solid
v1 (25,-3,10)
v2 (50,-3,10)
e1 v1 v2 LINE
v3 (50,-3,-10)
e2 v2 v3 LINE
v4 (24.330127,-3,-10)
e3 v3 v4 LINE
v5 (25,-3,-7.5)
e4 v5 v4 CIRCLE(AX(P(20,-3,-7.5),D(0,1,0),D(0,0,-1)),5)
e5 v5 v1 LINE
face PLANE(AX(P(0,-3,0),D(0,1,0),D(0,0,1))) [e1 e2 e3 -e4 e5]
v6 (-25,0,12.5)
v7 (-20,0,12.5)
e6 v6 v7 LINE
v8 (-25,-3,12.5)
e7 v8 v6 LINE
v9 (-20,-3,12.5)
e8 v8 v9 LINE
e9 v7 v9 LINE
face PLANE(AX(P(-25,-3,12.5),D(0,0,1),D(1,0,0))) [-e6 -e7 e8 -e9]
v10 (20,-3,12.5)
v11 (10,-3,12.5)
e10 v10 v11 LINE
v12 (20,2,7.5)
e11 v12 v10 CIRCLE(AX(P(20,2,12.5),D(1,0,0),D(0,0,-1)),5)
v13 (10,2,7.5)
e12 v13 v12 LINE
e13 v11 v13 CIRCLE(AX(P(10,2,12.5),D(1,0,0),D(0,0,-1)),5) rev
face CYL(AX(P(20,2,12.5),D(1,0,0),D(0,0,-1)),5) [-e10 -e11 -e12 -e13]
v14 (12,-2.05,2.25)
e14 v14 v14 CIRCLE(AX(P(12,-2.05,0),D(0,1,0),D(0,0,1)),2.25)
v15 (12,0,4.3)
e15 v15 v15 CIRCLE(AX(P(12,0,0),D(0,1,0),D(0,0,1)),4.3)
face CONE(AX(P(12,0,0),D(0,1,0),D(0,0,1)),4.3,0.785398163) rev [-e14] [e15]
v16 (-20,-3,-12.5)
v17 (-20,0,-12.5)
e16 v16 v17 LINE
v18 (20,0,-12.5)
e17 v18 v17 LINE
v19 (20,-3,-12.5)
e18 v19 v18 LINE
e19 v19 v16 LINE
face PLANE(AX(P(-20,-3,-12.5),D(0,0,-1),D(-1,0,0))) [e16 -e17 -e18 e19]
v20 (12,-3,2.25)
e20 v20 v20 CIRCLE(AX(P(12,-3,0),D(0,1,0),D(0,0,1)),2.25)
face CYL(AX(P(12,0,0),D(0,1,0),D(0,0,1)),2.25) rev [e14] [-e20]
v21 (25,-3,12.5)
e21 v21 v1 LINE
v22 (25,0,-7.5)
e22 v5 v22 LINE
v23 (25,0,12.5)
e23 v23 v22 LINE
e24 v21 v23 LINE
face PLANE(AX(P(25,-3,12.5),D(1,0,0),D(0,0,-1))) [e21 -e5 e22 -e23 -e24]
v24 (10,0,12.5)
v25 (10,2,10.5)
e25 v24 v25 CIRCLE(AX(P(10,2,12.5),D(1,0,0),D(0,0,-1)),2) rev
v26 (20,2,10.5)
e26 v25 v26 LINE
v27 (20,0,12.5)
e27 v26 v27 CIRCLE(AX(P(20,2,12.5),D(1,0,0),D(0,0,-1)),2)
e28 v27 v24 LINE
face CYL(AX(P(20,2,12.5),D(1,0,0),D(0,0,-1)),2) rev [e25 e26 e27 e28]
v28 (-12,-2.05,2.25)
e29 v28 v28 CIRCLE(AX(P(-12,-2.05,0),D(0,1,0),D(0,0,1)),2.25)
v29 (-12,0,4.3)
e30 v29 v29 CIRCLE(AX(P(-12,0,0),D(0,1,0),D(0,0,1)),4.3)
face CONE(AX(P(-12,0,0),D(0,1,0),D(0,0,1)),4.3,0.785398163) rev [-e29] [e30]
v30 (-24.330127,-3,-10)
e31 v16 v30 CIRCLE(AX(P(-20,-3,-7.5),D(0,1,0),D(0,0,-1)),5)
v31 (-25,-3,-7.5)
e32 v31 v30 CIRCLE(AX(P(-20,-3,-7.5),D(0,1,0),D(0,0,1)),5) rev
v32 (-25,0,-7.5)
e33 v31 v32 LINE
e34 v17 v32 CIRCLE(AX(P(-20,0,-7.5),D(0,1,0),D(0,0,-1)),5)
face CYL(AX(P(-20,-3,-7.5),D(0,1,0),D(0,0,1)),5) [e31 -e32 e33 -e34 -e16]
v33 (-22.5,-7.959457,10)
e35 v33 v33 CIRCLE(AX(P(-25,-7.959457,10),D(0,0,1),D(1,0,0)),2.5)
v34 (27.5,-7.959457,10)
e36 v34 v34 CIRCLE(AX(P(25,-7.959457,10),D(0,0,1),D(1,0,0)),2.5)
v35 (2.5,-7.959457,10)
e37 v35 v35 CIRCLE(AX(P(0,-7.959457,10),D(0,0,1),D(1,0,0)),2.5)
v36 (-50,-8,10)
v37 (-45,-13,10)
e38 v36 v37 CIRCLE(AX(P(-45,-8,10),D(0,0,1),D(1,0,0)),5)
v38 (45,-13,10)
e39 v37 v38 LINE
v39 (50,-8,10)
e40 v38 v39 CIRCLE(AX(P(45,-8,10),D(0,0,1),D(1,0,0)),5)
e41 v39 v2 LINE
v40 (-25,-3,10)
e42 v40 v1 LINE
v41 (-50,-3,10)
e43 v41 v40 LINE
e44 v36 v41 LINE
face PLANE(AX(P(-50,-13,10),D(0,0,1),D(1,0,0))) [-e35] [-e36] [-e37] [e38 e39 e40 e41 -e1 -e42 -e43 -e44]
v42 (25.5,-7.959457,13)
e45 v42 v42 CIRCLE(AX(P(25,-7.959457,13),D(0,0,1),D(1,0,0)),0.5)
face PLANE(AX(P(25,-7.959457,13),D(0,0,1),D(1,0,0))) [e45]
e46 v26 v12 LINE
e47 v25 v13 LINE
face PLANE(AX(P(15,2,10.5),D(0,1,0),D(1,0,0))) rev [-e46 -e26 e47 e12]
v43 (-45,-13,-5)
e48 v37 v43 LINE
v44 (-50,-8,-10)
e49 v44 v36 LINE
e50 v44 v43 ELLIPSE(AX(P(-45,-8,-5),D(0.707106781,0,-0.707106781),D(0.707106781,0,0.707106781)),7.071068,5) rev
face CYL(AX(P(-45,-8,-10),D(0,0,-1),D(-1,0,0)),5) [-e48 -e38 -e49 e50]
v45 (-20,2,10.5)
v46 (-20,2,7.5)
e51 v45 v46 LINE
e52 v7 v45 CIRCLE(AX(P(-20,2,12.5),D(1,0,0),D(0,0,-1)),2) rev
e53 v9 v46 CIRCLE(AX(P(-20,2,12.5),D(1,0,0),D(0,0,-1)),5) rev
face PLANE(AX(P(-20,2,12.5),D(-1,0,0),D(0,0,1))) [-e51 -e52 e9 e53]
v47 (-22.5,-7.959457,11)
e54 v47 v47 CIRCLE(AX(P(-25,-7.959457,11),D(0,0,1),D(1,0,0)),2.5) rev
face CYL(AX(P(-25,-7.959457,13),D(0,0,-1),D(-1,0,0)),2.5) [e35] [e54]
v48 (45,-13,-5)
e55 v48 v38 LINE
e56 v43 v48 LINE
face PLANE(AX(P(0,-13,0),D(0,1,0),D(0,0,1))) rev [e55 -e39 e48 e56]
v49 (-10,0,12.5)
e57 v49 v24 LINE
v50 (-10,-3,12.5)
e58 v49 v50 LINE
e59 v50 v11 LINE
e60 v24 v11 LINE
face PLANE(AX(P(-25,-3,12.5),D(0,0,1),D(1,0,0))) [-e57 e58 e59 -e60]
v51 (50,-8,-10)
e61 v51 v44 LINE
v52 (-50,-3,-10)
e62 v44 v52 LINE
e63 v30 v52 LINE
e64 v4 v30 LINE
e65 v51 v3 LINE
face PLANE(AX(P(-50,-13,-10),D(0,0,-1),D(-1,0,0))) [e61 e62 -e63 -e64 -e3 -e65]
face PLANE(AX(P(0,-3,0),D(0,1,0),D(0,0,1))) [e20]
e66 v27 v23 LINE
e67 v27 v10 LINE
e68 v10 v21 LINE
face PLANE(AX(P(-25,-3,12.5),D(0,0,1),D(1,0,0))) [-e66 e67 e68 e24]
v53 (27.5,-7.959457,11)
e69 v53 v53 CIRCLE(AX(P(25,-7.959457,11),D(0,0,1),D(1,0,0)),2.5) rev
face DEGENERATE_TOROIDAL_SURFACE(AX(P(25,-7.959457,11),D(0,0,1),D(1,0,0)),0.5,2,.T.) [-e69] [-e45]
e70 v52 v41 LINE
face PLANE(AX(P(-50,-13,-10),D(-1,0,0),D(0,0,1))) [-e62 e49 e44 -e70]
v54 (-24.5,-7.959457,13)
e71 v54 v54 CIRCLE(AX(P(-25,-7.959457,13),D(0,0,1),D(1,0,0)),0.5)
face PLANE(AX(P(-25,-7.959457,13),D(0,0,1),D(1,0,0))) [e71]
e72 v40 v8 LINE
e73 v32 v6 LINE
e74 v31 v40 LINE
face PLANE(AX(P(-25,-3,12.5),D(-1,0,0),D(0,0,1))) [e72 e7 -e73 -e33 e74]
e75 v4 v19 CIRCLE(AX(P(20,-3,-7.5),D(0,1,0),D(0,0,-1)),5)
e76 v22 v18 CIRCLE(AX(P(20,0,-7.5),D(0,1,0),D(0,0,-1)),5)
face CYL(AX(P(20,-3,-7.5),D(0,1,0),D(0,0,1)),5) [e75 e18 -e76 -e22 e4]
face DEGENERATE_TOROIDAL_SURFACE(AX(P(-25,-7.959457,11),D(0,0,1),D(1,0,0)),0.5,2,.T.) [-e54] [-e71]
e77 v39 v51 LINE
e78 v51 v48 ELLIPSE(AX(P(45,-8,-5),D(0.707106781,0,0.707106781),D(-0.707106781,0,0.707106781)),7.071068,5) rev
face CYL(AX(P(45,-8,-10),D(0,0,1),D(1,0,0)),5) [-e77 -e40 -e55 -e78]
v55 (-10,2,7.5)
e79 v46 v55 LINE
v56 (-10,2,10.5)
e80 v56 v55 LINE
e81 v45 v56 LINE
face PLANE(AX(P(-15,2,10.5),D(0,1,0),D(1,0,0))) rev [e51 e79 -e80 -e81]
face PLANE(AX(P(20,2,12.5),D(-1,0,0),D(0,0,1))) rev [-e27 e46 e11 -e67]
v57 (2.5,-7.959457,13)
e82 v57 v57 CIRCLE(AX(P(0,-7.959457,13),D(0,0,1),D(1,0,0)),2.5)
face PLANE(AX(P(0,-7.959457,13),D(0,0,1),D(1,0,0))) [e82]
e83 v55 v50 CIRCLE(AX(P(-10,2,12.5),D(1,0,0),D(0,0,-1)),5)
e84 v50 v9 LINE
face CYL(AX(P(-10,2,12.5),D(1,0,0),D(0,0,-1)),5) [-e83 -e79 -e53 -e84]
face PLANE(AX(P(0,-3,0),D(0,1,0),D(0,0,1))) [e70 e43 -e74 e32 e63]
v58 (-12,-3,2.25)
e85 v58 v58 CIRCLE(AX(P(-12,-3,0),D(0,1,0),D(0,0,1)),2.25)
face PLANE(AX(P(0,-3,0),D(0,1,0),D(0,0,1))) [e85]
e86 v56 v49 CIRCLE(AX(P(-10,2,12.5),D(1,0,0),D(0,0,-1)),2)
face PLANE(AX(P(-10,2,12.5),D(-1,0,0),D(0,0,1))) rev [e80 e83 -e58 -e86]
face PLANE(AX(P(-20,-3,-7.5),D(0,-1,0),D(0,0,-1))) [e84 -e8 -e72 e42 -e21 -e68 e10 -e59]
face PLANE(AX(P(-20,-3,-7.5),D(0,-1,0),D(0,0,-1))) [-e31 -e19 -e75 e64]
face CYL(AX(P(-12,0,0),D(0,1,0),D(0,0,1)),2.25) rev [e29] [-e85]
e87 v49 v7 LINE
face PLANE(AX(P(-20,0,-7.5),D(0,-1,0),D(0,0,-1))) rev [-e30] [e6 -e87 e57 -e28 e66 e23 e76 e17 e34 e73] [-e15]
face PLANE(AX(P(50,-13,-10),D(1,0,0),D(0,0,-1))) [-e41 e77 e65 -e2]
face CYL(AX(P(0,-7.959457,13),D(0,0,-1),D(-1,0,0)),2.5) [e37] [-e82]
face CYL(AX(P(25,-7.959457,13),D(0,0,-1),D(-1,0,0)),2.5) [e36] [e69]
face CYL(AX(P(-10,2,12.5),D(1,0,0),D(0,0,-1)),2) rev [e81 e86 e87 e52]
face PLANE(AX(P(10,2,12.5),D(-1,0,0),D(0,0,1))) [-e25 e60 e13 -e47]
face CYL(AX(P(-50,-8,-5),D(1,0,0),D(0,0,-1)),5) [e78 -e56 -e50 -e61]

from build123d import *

# Parameters (mm, degrees)
SM_BASE_FLANGE_1_DEPTH   = 3
OTHER_START              = 10
OTHER_1_DEPTH            = 10
OTHER_START_2            = -20
OTHER_2_DEPTH            = 10
HOLE_WIZARD_1_AT_2_COUNT = 2
HOLE_WIZARD_1_AT_2_PITCH = 24
SKETCH_12_W              = 100
SKETCH_12_H              = 20
EXTRUDE_1_DEPTH          = 10
FILLET_1_R               = 5
SKETCH_13_R              = 2.5
EXTRUDE_2_DEPTH          = 3
FILLET_2_R               = 2


# Read off the part's stored shape, not the designer's step: 褶边1, 褶边2
# Sheet-metal steps are written as plain solids
with BuildPart() as part:
    # Sketch 1 → 基体-法兰1 (new body)
    with BuildSketch(Plane(origin=(0, 0, 0), x_dir=(1, 0, 0), z_dir=(0, 1, 0))):
        with BuildLine():
            Line((-25, -12.5), (25, -12.5))
            Line((25, -12.5), (25, 7.5))
            ThreePointArc((25, 7.5), (23.535533906, 11.035533906), (20, 12.5))
            Line((20, 12.5), (-20, 12.5))
            ThreePointArc((-20, 12.5), (-23.535533906, 11.035533906), (-25, 7.5))
            Line((-25, 7.5), (-25, -12.5))
        make_face()
    extrude(amount=-SM_BASE_FLANGE_1_DEPTH)

    # Other 1 outline → Other 1 (add)
    with BuildSketch(Plane.YZ.offset(OTHER_START)):
        with BuildLine():
            Line((2, 10.5), (2, 7.5))
            ThreePointArc((2, 7.5), (5.535533906, 16.035533906), (-3, 12.5))
            Line((-3, 12.5), (0, 12.5))
            ThreePointArc((0, 12.5), (3.414213562, 13.914213562), (2, 10.5))
        make_face()
    extrude(amount=OTHER_1_DEPTH)

    # Other 2 outline → Other 2 (add)
    with BuildSketch(Plane.YZ.offset(OTHER_START_2)):
        with BuildLine():
            Line((2, 10.5), (2, 7.5))
            ThreePointArc((2, 7.5), (5.535533906, 16.035533906), (-3, 12.5))
            Line((-3, 12.5), (0, 12.5))
            ThreePointArc((0, 12.5), (3.414213562, 13.914213562), (2, 10.5))
        make_face()
    extrude(amount=OTHER_2_DEPTH)

    # 草图11 → 打孔尺寸(%根据十字)槽半沉头木螺钉的类型1 (revolve, cut)
    with BuildSketch(Plane(origin=(-12, 0, 0), x_dir=(0, 0, 1), z_dir=(1, 0, 0))):
        Polygon((0, 0), (0, 3), (2.25, 3), (2.25, 2.05), (4.3, 0), align=None)
    hole_wizard_1 = revolve(axis=Axis((-12, 6.35, 0), (0, -1, 0)), mode=Mode.SUBTRACT)

    # 打孔尺寸(%根据十字)槽半沉头木螺钉的类型1 at 2: 打孔尺寸(%根据十字)槽半沉头木螺钉的类型1 ×2
    with Locations(*[(i * HOLE_WIZARD_1_AT_2_PITCH, 0, 0) for i in range(1, HOLE_WIZARD_1_AT_2_COUNT)]):
        add(hole_wizard_1, mode=Mode.SUBTRACT)

    # 草图12 → 凸台-拉伸1 (add)
    with BuildSketch(Plane(origin=(0, -3, 0), x_dir=(1, 0, 0), z_dir=(0, 1, 0))):
        Rectangle(SKETCH_12_W, SKETCH_12_H)
    extrude(amount=-EXTRUDE_1_DEPTH)

    # 圆角1
    fillet_1_edges = [part.edges().sort_by_distance(p)[0] for p in [
        (50, -13, 0),
        (-50, -13, 0),
        (0, -13, -10),
    ]]
    fillet(fillet_1_edges, radius=FILLET_1_R)

    # 草图13 → 凸台-拉伸2 (add)
    with BuildSketch(Plane.XY.offset(10)):
        with Locations((-25, -7.95945711)):
            Circle(SKETCH_13_R)
        with Locations((0, -7.95945711)):
            Circle(SKETCH_13_R)
        with Locations((25, -7.95945711)):
            Circle(SKETCH_13_R)
    extrude(amount=EXTRUDE_2_DEPTH)

    # 圆角2
    fillet_2_edges = [part.edges().sort_by_distance(p)[0] for p in [
        (22.5, -7.95945711, 13),
        (-27.5, -7.95945711, 13),
    ]]
    fillet(fillet_2_edges, radius=FILLET_2_R)


solid = part.part
